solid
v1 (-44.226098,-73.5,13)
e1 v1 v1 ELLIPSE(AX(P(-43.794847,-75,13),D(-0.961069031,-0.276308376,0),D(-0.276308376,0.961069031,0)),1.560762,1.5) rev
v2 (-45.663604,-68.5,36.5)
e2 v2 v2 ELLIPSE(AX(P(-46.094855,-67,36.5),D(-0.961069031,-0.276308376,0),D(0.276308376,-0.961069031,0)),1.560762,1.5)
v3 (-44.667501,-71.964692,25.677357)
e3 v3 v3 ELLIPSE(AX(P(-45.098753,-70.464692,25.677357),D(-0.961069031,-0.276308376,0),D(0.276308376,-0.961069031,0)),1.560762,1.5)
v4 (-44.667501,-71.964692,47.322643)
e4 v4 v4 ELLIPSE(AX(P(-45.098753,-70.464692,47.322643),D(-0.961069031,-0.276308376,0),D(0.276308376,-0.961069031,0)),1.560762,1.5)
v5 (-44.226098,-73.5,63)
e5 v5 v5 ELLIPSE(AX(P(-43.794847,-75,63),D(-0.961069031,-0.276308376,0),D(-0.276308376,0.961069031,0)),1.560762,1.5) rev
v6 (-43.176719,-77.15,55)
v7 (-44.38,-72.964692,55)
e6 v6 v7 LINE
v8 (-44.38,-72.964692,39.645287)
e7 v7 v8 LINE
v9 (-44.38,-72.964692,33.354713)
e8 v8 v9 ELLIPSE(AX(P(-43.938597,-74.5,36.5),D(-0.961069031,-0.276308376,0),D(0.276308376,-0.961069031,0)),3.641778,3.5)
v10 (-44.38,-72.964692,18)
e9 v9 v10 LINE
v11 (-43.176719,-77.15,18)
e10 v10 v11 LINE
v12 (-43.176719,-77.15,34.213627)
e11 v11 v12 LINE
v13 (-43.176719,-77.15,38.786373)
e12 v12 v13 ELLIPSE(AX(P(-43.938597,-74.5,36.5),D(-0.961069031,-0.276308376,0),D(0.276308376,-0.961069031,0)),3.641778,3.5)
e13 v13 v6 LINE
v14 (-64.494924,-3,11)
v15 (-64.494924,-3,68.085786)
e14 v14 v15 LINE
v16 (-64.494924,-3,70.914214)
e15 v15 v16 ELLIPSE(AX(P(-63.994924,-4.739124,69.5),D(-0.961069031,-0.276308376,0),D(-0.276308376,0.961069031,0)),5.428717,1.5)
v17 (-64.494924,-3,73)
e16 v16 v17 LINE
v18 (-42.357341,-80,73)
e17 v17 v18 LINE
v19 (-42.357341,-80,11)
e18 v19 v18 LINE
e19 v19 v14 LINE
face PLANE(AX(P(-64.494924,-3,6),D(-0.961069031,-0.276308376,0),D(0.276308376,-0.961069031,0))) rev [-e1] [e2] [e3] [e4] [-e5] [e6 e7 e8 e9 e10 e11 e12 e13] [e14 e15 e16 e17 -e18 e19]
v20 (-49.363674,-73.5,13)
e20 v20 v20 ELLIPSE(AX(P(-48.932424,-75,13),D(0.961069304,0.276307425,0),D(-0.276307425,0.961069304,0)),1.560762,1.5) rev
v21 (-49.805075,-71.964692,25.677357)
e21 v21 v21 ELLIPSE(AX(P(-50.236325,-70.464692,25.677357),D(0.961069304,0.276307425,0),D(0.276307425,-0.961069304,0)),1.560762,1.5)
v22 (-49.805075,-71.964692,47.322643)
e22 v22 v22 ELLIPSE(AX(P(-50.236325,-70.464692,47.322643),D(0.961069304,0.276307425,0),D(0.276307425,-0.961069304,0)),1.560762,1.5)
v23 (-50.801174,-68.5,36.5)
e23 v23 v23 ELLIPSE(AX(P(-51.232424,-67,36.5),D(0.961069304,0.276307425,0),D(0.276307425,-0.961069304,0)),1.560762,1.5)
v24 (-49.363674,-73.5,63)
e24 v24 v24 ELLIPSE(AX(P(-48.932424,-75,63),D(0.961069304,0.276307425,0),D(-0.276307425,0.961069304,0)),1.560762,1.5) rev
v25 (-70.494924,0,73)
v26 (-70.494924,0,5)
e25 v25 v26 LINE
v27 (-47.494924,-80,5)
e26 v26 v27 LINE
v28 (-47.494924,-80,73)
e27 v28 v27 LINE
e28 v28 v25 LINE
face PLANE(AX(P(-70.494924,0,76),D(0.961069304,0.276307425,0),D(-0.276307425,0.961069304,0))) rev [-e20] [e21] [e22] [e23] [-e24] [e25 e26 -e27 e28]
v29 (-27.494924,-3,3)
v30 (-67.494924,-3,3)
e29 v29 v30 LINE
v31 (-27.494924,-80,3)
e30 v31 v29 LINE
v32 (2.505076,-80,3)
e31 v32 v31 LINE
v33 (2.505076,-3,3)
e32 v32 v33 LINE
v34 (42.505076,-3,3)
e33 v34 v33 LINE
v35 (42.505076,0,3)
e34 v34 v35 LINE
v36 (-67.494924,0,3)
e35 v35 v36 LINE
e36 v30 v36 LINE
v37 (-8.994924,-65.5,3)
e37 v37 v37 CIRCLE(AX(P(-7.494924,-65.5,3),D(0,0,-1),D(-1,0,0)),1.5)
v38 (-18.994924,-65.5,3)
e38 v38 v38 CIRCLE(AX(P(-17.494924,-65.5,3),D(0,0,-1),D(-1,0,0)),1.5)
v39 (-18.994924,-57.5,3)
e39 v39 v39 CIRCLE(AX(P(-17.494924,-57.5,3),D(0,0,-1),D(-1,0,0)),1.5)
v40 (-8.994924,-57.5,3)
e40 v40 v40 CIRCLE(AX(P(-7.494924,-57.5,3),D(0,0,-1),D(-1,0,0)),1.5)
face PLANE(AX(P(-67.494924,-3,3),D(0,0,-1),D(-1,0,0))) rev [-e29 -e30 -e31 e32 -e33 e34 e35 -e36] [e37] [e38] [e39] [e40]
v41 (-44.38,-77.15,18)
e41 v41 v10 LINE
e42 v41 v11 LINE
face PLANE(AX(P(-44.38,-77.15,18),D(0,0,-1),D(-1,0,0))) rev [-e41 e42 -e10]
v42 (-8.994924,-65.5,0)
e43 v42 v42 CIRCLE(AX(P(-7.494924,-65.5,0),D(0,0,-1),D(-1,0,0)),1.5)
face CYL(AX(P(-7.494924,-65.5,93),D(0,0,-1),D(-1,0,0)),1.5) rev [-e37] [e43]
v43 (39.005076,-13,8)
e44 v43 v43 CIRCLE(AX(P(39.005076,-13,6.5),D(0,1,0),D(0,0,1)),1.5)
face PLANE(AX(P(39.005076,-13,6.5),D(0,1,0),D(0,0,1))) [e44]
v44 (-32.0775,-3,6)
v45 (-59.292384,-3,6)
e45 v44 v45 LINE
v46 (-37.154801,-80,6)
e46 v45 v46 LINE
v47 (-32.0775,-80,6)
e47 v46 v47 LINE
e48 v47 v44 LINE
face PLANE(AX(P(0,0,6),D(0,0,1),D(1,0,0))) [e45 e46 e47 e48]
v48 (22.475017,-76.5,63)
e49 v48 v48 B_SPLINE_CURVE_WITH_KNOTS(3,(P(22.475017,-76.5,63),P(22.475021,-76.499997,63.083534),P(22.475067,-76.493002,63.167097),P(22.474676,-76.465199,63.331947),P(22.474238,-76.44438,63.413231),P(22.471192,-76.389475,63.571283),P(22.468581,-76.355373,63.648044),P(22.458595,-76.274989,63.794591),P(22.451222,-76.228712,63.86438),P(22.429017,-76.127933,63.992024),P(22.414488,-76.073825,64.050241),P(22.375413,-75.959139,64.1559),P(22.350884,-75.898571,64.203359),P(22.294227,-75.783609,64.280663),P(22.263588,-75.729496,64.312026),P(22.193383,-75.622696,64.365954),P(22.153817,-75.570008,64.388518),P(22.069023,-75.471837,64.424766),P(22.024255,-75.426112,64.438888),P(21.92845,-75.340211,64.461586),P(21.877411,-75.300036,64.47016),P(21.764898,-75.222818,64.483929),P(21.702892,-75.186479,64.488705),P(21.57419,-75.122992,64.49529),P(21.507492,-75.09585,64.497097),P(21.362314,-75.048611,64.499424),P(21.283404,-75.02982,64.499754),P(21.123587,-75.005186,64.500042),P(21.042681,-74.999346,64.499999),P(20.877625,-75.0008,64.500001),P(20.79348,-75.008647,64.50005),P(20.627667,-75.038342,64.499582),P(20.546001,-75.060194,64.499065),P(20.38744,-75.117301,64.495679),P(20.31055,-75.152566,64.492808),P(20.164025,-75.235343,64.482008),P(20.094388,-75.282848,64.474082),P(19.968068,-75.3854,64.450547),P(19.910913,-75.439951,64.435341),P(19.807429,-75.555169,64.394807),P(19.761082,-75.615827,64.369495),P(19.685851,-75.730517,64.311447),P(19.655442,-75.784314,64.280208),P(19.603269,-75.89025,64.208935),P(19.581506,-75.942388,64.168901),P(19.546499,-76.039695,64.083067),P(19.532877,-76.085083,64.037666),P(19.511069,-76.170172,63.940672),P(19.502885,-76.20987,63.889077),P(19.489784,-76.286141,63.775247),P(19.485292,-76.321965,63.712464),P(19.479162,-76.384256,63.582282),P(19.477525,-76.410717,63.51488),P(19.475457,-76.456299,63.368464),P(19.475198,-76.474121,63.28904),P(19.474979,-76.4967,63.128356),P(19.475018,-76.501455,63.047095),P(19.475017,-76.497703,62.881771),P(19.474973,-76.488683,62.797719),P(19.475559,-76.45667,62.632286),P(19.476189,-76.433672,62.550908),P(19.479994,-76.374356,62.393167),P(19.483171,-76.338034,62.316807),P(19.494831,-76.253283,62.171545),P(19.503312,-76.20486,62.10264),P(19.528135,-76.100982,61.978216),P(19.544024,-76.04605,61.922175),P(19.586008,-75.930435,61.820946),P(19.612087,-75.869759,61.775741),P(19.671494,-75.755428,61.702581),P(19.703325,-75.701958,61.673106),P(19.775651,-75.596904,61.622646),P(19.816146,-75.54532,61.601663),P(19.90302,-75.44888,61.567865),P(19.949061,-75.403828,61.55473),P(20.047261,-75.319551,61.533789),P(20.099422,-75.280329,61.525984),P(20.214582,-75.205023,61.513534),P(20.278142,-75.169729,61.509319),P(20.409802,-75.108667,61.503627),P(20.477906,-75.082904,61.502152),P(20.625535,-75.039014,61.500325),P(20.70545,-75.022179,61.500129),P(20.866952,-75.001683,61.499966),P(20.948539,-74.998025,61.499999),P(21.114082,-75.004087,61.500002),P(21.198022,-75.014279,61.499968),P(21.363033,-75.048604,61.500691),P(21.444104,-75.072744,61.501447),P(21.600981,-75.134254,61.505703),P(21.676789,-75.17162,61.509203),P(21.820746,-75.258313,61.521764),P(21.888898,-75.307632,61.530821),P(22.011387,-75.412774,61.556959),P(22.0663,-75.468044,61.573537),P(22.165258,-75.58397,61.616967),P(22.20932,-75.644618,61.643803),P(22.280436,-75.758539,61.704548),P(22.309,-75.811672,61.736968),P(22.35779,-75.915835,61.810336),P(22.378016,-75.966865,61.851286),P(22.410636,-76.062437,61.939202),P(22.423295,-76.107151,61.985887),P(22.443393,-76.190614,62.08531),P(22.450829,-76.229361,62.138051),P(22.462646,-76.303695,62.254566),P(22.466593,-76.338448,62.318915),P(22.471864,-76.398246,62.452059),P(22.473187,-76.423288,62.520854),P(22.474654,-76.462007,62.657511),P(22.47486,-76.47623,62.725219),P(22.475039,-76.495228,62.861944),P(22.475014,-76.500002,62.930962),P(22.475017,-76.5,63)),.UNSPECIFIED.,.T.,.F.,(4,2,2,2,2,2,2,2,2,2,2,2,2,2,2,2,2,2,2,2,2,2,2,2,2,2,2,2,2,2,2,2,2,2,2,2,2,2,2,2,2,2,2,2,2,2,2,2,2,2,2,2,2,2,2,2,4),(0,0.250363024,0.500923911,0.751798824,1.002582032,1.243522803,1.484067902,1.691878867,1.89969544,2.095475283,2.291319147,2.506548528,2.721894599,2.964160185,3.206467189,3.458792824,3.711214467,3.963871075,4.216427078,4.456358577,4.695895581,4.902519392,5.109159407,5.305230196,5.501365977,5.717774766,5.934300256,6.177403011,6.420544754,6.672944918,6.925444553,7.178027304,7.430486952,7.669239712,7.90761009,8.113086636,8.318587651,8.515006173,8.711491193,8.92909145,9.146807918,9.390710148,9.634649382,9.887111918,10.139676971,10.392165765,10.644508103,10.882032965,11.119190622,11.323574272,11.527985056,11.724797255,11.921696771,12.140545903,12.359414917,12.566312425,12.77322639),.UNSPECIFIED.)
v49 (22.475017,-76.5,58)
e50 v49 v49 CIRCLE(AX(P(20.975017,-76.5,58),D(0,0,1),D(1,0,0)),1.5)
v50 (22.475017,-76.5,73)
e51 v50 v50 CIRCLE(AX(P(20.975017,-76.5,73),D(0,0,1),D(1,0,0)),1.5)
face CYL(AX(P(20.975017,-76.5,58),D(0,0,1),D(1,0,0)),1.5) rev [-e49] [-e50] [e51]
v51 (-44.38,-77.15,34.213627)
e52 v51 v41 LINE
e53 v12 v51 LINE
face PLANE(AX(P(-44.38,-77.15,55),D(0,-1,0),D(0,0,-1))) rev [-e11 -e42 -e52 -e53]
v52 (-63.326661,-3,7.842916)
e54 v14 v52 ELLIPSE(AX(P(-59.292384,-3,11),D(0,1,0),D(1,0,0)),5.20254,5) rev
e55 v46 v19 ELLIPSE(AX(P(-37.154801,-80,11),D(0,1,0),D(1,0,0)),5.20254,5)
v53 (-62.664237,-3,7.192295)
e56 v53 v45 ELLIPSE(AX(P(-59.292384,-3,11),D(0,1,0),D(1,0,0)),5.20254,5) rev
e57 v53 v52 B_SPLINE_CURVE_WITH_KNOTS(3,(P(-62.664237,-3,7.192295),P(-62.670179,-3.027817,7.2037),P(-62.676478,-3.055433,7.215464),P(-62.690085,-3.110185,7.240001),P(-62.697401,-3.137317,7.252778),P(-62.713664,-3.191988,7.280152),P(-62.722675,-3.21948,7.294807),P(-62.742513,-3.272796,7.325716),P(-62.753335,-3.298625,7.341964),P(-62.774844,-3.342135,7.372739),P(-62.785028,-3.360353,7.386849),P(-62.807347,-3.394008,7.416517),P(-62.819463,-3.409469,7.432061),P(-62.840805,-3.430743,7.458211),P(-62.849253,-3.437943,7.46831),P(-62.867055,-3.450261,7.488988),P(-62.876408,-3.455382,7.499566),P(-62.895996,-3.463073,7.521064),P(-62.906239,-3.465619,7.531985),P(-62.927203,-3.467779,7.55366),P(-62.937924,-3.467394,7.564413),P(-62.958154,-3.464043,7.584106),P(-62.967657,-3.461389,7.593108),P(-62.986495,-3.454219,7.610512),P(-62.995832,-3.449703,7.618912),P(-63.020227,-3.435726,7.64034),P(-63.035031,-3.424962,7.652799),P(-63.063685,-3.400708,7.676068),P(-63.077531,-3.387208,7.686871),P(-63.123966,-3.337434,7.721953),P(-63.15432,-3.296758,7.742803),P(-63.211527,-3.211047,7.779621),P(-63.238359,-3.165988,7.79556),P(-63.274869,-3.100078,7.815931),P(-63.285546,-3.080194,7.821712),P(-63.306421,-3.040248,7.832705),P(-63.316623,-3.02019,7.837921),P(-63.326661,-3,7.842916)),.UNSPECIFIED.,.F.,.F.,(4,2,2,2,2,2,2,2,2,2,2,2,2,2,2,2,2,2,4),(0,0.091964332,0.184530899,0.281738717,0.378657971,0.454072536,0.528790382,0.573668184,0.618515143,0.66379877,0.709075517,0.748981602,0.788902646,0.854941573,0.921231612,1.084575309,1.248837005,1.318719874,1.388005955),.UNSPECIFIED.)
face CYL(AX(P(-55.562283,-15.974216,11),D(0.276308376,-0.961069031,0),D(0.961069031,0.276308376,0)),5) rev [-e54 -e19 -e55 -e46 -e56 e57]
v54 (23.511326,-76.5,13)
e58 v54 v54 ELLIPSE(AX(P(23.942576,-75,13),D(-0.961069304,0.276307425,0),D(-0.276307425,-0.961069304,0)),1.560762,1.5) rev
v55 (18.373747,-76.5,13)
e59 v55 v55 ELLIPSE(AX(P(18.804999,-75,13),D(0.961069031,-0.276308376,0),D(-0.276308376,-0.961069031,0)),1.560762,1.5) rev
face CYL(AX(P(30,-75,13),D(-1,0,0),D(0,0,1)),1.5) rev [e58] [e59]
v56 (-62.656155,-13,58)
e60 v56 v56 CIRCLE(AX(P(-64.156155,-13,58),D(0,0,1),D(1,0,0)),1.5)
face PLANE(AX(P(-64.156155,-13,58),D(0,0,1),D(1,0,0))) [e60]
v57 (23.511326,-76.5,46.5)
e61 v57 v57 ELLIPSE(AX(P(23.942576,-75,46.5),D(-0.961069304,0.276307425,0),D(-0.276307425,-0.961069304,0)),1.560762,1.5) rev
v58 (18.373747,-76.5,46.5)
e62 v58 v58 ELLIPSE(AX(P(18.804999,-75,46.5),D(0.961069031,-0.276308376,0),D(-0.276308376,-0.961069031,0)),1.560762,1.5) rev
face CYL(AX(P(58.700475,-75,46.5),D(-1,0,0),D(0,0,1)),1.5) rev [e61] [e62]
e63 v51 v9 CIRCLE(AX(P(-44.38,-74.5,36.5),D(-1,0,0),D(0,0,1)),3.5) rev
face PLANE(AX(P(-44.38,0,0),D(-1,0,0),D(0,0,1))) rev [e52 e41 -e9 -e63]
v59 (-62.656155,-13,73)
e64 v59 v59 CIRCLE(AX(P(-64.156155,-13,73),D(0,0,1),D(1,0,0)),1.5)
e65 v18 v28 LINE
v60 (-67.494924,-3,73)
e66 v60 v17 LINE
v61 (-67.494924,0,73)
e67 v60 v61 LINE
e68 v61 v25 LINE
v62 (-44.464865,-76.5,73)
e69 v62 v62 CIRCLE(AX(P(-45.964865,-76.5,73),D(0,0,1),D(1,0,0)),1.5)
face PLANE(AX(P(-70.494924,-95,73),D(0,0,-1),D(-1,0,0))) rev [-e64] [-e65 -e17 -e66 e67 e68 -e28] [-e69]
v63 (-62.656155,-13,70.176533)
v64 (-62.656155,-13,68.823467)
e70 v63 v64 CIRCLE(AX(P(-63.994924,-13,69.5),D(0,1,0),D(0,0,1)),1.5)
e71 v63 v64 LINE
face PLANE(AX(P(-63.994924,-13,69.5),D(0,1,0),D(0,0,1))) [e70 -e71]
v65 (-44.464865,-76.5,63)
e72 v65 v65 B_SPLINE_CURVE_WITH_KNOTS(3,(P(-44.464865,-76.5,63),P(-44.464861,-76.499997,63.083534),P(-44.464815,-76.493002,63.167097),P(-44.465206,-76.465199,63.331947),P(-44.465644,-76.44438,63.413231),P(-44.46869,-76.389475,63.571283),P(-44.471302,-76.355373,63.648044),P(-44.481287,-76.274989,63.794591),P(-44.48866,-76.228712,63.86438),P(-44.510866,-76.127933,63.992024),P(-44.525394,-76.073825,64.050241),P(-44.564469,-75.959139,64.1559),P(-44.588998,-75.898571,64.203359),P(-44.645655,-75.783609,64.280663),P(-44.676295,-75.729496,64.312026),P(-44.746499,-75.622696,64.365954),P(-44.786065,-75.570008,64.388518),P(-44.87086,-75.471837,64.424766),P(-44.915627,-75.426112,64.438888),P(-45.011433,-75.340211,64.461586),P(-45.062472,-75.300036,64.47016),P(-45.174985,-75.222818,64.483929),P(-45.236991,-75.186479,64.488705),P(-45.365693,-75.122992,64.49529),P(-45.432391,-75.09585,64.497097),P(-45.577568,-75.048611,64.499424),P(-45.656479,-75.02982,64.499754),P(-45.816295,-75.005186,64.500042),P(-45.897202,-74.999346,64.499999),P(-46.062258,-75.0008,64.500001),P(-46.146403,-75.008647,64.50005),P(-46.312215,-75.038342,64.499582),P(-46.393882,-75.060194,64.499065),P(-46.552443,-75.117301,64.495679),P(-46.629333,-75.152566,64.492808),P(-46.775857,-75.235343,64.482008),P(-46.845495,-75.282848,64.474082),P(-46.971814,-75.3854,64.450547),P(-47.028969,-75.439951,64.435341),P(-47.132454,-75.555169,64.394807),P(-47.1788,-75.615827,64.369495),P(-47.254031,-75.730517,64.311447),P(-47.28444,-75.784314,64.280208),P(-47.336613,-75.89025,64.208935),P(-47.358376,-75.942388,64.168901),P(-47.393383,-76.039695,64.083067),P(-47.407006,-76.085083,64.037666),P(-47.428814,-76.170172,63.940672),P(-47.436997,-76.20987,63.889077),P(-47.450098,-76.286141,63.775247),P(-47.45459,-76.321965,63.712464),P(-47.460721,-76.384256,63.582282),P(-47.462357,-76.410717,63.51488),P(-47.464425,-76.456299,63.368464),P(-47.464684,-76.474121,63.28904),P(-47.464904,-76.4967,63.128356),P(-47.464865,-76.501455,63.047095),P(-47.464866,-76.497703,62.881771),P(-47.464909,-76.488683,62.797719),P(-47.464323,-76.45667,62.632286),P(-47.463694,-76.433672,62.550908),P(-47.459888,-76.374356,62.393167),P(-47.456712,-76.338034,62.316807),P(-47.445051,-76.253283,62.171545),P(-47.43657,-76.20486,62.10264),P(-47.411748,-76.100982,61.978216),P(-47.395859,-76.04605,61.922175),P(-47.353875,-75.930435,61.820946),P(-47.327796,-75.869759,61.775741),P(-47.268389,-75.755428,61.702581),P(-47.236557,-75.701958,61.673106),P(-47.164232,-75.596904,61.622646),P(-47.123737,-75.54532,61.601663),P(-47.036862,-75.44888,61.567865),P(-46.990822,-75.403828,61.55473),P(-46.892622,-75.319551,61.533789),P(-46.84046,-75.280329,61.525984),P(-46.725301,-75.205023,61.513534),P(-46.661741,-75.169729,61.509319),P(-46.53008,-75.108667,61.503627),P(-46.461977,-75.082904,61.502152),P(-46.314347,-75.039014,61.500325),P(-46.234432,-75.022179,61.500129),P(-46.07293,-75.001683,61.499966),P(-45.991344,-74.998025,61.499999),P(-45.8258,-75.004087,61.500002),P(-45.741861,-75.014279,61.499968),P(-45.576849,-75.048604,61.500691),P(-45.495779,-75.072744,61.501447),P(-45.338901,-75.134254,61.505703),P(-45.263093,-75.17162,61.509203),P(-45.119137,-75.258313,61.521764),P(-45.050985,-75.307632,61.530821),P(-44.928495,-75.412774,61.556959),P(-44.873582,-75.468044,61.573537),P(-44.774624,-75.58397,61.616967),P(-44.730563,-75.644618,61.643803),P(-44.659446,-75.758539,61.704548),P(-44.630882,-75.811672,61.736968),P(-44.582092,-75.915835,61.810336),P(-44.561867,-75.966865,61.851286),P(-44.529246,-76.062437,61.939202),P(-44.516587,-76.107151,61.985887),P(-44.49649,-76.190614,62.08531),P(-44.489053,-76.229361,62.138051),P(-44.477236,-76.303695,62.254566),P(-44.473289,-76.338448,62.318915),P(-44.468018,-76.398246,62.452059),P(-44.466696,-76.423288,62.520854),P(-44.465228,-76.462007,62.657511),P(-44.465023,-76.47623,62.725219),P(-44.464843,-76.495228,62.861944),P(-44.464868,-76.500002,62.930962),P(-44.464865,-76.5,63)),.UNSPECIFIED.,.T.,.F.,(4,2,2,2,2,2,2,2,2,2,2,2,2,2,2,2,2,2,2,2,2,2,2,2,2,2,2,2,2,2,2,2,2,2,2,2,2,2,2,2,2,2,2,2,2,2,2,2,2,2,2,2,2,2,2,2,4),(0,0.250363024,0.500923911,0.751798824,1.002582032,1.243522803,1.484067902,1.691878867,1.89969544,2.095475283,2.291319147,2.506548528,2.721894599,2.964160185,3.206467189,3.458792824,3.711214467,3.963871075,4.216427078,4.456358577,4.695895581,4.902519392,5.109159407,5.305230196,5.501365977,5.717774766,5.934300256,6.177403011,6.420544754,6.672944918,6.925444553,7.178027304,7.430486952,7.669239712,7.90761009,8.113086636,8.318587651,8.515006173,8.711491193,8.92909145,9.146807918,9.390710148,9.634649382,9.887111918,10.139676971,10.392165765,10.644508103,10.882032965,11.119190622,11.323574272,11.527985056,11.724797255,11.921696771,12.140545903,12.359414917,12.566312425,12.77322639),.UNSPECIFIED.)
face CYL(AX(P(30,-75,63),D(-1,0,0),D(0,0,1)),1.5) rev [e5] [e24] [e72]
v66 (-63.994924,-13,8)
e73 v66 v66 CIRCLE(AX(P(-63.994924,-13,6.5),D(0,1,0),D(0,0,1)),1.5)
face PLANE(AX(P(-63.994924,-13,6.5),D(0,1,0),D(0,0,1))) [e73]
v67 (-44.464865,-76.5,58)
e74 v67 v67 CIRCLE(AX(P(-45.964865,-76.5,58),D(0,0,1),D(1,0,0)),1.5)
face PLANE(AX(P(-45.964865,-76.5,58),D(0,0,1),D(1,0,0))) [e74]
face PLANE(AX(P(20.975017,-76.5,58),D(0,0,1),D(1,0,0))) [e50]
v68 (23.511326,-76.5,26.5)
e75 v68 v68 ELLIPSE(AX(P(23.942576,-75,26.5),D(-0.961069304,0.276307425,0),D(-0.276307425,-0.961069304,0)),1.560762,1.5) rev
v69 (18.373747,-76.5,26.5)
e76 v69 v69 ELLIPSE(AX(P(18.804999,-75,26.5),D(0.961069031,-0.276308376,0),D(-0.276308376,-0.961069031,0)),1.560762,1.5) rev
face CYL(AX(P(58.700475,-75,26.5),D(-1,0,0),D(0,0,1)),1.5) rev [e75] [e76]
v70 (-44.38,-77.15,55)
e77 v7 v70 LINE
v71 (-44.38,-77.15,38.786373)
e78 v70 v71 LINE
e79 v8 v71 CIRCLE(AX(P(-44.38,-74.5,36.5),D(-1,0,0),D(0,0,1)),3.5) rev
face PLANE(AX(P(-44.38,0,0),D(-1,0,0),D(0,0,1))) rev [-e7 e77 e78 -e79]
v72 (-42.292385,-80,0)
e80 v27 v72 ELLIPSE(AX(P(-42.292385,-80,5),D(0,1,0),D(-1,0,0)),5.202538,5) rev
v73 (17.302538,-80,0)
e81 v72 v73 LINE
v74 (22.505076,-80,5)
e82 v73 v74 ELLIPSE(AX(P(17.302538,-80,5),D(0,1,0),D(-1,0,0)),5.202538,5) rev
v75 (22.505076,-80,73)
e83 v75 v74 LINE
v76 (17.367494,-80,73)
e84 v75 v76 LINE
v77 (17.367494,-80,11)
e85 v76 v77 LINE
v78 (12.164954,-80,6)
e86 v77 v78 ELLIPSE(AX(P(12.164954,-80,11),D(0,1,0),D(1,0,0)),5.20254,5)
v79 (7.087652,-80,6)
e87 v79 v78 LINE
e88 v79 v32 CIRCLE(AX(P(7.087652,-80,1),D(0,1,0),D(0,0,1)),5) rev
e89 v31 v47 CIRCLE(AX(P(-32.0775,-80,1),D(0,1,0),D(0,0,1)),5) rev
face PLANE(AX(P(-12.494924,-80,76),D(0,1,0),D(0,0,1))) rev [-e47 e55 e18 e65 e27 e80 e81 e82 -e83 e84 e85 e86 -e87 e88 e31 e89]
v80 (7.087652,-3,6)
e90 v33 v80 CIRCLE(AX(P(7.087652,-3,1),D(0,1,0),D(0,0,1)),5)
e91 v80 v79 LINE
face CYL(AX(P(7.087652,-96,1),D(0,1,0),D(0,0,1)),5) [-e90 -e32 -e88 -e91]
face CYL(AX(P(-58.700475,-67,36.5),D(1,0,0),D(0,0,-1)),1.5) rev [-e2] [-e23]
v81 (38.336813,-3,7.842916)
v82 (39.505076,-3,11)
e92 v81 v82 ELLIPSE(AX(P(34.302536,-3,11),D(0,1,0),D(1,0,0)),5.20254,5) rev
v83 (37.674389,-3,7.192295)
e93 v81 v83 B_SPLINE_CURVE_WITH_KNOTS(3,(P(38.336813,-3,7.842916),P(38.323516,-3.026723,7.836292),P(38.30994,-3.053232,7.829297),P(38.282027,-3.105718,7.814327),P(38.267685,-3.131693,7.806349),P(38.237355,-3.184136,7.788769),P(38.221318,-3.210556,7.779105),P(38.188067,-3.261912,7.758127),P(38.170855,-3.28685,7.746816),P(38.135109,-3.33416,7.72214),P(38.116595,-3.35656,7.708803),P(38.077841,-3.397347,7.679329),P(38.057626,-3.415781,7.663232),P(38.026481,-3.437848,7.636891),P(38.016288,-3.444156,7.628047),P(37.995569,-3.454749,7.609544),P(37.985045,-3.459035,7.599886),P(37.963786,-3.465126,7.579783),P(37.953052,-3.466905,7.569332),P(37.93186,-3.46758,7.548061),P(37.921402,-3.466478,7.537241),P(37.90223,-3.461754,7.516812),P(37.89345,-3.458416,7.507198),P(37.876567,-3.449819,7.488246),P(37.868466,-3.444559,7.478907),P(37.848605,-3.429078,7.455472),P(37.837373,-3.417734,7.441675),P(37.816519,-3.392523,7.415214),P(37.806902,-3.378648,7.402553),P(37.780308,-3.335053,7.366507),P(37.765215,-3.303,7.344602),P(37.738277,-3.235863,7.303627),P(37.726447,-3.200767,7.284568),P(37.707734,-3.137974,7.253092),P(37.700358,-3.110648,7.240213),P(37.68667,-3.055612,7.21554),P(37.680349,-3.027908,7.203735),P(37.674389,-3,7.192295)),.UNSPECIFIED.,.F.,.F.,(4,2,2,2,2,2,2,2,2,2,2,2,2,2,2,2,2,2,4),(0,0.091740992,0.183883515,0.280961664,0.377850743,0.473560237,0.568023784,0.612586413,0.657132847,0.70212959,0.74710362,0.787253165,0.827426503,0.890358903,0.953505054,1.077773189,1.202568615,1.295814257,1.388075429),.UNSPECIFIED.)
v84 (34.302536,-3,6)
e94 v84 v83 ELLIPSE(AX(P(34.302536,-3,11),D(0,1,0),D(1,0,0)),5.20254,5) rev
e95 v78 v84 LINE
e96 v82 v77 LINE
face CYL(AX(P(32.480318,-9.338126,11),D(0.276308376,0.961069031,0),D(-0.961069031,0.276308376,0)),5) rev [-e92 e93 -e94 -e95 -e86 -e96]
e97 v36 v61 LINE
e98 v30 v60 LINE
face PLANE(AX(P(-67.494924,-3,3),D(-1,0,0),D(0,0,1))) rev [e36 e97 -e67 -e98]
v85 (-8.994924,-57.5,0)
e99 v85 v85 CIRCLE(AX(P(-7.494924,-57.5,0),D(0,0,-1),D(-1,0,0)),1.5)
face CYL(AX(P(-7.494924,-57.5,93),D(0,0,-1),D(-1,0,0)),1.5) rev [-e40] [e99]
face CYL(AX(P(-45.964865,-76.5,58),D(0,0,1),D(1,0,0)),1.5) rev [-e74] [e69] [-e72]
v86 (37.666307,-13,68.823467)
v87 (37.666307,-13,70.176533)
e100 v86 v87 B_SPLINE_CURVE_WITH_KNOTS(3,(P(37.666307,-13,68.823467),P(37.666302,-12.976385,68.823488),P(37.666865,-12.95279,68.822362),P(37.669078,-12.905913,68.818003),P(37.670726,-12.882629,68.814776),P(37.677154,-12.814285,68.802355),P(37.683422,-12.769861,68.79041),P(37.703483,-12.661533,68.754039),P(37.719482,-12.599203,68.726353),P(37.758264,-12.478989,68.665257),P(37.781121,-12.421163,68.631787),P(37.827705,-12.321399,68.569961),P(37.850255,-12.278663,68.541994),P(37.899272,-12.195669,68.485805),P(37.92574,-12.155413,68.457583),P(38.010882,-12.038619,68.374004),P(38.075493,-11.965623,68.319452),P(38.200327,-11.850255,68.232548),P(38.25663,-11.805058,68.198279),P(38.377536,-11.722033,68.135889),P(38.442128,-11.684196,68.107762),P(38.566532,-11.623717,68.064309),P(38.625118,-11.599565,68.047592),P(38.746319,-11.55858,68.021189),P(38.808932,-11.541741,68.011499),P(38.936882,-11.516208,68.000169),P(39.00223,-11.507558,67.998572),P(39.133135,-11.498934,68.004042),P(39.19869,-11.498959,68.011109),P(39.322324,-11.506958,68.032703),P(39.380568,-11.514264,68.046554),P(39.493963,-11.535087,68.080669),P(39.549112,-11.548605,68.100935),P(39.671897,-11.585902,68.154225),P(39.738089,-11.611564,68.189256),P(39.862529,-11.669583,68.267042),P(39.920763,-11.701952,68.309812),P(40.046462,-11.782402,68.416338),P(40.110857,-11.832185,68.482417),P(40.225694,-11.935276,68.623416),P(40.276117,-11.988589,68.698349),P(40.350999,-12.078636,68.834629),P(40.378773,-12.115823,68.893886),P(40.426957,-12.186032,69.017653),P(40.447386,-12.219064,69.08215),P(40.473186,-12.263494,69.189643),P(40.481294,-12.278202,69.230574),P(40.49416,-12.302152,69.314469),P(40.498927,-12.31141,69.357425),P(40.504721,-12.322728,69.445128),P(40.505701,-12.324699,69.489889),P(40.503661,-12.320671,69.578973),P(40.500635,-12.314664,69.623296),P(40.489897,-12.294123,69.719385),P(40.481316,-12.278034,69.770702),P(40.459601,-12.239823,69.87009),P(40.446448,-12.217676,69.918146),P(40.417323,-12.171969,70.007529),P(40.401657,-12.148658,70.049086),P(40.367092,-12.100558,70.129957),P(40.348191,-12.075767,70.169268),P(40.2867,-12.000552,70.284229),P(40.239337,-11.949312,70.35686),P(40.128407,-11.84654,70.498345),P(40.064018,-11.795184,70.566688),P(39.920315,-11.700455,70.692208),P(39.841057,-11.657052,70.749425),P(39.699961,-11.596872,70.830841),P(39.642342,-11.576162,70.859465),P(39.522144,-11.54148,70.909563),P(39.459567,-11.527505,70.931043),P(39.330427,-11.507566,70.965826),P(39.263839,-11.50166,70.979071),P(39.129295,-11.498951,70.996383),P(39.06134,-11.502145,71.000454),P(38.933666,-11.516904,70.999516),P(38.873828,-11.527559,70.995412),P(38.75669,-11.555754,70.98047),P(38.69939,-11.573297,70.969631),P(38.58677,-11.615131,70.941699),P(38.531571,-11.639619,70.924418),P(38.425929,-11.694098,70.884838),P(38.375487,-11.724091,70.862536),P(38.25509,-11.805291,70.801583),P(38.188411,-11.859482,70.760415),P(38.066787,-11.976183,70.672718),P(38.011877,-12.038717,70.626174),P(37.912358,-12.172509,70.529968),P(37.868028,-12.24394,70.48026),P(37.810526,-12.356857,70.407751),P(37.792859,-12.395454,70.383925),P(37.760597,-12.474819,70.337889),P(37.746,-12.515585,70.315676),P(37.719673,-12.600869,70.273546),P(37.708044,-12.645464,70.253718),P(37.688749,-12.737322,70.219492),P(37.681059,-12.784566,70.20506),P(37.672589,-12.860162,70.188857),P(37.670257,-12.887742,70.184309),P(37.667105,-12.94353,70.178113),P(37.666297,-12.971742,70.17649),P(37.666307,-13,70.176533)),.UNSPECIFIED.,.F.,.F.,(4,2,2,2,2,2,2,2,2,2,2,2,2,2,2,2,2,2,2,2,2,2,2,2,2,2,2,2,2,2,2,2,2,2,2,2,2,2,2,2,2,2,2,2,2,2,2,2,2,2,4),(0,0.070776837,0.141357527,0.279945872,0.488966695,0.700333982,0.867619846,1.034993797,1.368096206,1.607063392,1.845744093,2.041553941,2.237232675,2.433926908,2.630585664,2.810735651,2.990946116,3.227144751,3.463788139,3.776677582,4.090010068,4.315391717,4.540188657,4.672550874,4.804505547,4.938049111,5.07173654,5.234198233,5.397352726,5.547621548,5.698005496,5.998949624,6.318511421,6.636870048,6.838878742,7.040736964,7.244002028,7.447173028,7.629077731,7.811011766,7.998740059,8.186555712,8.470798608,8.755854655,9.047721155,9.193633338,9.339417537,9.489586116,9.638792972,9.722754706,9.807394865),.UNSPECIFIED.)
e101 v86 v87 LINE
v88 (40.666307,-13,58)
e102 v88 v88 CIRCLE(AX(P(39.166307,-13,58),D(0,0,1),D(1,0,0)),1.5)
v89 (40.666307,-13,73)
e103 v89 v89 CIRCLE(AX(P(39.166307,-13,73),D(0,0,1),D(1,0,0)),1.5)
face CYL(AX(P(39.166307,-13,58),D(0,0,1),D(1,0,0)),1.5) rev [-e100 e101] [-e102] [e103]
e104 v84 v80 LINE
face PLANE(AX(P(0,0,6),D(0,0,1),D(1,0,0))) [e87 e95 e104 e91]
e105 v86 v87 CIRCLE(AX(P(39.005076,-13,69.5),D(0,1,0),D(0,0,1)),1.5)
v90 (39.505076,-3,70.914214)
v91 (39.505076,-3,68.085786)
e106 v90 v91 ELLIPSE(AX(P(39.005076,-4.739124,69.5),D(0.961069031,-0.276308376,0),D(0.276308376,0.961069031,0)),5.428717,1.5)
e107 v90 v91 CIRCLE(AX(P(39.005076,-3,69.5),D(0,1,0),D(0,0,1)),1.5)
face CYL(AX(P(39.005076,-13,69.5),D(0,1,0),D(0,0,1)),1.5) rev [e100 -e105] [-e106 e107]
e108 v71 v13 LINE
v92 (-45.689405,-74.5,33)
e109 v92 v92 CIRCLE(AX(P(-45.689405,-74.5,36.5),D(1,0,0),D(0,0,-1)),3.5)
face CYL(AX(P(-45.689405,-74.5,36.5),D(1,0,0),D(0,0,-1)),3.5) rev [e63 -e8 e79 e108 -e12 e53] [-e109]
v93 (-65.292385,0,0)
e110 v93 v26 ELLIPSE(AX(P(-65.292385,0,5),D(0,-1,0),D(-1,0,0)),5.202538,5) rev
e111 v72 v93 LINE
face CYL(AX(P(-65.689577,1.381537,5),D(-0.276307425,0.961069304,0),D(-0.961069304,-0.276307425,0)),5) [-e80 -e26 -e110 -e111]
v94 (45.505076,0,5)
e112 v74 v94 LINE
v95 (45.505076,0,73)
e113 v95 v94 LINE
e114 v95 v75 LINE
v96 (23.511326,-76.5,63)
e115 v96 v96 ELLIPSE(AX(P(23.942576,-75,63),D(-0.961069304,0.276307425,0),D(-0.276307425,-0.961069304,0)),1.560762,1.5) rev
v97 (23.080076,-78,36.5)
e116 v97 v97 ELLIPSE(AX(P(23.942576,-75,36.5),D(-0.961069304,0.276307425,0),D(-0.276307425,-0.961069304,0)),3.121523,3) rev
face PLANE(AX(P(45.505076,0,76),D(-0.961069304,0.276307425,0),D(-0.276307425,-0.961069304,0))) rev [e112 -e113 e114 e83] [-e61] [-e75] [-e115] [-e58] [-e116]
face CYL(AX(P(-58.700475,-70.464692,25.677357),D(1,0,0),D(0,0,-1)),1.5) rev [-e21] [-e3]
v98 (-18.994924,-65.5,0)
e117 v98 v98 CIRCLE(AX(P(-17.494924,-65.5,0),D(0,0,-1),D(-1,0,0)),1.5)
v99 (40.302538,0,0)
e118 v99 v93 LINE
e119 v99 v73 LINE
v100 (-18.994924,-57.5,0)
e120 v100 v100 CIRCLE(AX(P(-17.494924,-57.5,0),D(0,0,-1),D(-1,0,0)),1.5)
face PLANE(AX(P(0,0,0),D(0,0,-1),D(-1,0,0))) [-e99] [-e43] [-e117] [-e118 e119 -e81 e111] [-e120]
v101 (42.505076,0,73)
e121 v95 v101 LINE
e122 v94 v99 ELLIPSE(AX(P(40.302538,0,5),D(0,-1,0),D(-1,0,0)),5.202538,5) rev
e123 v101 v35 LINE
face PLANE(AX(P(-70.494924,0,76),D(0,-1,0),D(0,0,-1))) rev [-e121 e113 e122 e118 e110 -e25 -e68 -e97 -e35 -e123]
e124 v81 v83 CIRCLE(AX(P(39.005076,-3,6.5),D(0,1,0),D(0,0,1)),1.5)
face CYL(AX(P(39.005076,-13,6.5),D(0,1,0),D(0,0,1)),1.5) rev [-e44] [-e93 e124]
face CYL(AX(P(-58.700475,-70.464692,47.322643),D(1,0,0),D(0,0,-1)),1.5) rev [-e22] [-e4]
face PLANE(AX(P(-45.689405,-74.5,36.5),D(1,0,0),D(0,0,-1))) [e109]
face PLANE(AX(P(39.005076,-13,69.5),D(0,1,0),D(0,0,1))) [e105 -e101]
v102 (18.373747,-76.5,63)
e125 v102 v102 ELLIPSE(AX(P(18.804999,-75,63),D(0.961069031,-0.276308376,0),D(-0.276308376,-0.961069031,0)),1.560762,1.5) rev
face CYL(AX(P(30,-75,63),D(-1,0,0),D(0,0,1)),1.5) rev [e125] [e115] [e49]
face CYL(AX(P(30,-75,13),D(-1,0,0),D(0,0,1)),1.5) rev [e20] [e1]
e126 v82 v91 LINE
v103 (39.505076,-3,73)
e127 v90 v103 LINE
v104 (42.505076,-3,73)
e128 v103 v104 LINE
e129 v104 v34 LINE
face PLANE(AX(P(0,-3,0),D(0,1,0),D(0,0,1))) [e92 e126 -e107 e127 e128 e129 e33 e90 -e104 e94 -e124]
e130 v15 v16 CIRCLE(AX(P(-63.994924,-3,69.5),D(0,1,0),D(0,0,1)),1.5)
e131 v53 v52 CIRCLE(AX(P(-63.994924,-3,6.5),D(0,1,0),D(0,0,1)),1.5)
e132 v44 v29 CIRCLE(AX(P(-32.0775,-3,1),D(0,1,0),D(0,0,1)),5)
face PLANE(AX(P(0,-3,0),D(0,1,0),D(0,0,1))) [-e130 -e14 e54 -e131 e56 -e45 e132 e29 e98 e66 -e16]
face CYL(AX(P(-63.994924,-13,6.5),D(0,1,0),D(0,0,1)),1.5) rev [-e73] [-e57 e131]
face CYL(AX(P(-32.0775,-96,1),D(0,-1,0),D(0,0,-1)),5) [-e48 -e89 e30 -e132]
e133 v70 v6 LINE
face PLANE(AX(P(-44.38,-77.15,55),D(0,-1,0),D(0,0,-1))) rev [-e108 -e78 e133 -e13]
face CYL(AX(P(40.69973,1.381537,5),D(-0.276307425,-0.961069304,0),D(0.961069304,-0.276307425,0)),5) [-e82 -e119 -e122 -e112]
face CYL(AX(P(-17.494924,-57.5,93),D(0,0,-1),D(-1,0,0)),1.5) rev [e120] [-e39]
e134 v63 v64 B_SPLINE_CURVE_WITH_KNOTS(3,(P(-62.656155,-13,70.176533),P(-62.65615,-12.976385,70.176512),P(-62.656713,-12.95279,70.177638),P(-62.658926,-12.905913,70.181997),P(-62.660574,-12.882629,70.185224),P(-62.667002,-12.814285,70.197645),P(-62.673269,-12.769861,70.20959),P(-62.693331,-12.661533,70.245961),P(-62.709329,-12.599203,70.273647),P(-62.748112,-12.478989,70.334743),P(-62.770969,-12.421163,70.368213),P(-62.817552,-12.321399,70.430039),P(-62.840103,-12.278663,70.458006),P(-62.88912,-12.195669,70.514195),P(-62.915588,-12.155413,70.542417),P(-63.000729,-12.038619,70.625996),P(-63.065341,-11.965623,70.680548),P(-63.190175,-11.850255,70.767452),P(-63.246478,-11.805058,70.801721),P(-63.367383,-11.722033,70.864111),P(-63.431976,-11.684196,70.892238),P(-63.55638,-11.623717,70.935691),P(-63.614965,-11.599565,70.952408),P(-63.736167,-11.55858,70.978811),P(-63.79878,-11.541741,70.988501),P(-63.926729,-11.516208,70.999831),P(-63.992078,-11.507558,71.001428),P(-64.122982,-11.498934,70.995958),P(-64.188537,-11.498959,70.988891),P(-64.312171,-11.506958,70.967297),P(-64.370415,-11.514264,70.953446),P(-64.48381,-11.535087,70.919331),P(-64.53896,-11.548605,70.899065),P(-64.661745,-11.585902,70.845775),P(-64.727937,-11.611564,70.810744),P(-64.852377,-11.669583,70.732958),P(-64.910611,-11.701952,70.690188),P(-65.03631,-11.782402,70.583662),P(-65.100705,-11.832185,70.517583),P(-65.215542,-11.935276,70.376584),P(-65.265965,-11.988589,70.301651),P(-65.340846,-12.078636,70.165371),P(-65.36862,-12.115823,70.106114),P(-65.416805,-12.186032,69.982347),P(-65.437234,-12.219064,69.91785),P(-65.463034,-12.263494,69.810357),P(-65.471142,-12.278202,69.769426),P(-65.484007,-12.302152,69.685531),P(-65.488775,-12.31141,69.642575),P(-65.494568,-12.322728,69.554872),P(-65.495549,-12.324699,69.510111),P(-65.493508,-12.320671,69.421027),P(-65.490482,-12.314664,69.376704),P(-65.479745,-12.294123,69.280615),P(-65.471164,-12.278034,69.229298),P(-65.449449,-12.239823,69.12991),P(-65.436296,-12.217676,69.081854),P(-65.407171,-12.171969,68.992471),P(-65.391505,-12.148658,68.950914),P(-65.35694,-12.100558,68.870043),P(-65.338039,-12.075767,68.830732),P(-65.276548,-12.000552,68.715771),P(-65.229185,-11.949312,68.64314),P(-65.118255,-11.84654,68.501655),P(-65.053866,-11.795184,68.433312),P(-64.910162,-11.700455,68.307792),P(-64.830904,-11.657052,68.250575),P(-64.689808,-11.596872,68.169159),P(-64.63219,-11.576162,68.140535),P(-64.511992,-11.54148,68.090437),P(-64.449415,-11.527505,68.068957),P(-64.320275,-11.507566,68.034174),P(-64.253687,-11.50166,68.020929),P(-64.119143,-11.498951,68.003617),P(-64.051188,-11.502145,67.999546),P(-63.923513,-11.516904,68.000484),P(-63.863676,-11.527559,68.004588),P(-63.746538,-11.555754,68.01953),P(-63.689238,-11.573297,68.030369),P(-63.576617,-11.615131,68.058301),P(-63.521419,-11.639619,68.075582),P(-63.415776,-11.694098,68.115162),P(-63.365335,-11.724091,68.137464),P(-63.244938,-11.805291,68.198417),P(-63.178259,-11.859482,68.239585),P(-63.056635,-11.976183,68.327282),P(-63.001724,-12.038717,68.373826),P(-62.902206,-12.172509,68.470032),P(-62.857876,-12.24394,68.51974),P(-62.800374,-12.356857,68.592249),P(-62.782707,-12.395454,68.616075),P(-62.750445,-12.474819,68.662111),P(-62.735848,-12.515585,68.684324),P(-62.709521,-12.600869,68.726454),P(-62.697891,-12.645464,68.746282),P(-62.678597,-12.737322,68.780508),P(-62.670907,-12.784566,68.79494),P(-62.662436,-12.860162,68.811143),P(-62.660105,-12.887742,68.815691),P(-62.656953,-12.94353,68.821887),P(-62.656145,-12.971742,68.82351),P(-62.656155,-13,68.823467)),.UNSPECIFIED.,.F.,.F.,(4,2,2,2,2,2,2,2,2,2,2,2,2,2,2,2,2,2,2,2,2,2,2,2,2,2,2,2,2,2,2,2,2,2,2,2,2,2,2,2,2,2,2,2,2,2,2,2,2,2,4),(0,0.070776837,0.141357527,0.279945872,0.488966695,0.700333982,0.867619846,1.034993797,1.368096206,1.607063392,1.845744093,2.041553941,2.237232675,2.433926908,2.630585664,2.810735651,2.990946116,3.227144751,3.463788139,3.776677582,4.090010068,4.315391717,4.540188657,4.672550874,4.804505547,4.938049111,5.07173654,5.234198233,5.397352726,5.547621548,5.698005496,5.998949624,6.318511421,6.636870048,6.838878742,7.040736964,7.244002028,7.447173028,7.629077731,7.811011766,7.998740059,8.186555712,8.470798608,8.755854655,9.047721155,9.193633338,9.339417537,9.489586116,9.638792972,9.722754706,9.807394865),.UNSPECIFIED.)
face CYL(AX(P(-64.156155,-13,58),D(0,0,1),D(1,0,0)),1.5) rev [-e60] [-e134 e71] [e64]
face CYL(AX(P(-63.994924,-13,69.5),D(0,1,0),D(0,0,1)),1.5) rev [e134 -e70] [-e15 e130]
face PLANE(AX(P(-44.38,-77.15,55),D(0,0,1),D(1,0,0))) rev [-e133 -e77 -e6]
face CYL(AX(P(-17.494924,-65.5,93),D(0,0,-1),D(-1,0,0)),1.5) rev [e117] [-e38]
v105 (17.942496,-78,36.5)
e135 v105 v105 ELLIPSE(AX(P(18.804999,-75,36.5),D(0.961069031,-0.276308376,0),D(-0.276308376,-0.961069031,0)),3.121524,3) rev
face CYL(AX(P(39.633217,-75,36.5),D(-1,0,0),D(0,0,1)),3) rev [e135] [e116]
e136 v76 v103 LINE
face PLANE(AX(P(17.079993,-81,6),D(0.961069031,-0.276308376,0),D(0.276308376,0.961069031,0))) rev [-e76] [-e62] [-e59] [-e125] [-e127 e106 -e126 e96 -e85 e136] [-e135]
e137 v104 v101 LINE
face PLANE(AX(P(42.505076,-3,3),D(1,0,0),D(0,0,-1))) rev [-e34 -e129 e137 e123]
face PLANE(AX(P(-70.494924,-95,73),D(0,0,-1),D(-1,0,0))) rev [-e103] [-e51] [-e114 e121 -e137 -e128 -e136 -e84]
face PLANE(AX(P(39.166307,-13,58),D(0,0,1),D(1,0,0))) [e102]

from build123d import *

# Parameters (mm, degrees)
BOSS_EXTRUDE1_DEPTH     = 76
CUT_EXTRUDE1_DEPTH      = 3
CUT_EXTRUDE2_DEPTH      = 70
SKETCH4_W               = 116
SKETCH4_H               = 3
CUT_EXTRUDE3_DEPTH      = 95.00000000000003
FILLET1_R               = 5
FILLET2_R               = 5
SKETCH6_R               = 1.500000000000004
SKETCH6_R_2             = 1.4999999999999971
SKETCH6_R_3             = 1.4999999999999973
SKETCH6_R_4             = 1.5000000000000042
CUT_EXTRUDE4_DEPTH      = 10
SKETCH7_W               = 29.999999999999996
SKETCH7_H               = 5.999999999999984
CUT_EXTRUDE5_DEPTH      = 93.00000000000001
FILLET3_R               = 5
FILLET4_R               = 5
SKETCH8_R               = 1.4999999999999991
SKETCH8_R_2             = 1.5000000000000009
CUT_EXTRUDE6_DEPTH      = 93.00000000000001
SKETCH9_R               = 1.5000000000000009
SKETCH9_R_2             = 1.5000000000000042
SKETCH9_R_3             = 1.4999999999999973
CUT_EXTRUDE7_DEPTH      = 15
FILLET5_R               = 5
FILLET6_R               = 5
CUT_EXTRUDE8_DEPTH      = 30
CUT_EXTRUDE8_DEPTH_BACK = 70
SKETCH10_R              = 1.4999999999999973
SKETCH10_R_2            = 1.5000000000000009
SKETCH12_R              = 3.500000000000001
CUT_EXTRUDE9_DEPTH      = 45.6894054301587
SKETCH13_R              = 3.0000000000000018
CUT_EXTRUDE10_DEPTH     = 39.63321669991409
SKETCH15_W              = 37.000000000000014
SKETCH15_H              = 5.299999999999997
CUT_EXTRUDE13_DEPTH     = 44.38
SKETCH17_R              = 1.5000000000000042
SKETCH17_R_2            = 1.5000000000000009
CUT_EXTRUDE14_DEPTH     = 58.70047510000001
SKETCH18_R              = 1.5000000000000042
CUT_EXTRUDE15_DEPTH     = 58.70047510000001
SKETCH19_R              = 1.5000000000000042
SKETCH19_R_2            = 1.5000000000000009
CUT_EXTRUDE16_DEPTH     = 58.70047510000001


with BuildPart() as part:
    # Sketch1 → Boss-Extrude1 (new body)
    with BuildSketch(Plane.XY):
        Polygon((-70.49492385786803, 0), (45.505076142131976, 0), (22.50507614213199, -80), (-12.494923857868015, -80), (-47.494923857868024, -80), align=None)
    extrude(amount=BOSS_EXTRUDE1_DEPTH)

    # Sketch2 → Cut-Extrude1 (cut)
    with BuildSketch(Plane(origin=(0, 0, 0), x_dir=(1, 0, 0), z_dir=(0, 1, 0))):
        Polygon((-67.49492385786803, -3), (42.505076142131976, -3), (42.50507614213198, -73), (-67.49492385786802, -73), align=None)
    extrude(amount=-CUT_EXTRUDE1_DEPTH, mode=Mode.SUBTRACT)

    # Sketch3 → Cut-Extrude2 (cut)
    with BuildSketch(Plane.XY.offset(76)):
        Polygon((-42.069840297681274, -81), (17.079992581945223, -81), (39.505076142131976, -3.0000000000000124), (-64.49492385786802, -3.0000000000000124), align=None)
    extrude(amount=-CUT_EXTRUDE2_DEPTH, mode=Mode.SUBTRACT)

    # Sketch4 → Cut-Extrude3 (cut)
    with BuildSketch(Plane(origin=(0, 0, 0), x_dir=(1, 0, 0), z_dir=(0, 1, 0))):
        with Locations((-12.494923857868027, -74.5)):
            Rectangle(SKETCH4_W, SKETCH4_H)
    extrude(amount=-CUT_EXTRUDE3_DEPTH, mode=Mode.SUBTRACT)

    # Fillet1
    fillet1_edges = [part.edges().sort_by_distance(p)[0] for p in [
        (28.43628489768082, -41.50000000000001, 6),
    ]]
    fillet(fillet1_edges, radius=FILLET1_R)

    # Fillet2
    fillet2_edges = [part.edges().sort_by_distance(p)[0] for p in [
        (-53.42613261341687, -41.500000000000014, 6),
    ]]
    fillet(fillet2_edges, radius=FILLET2_R)

    # Sketch6 → Cut-Extrude4 (cut)
    with BuildSketch(Plane(origin=(0, -3, 0), x_dir=(1, 0, 0), z_dir=(0, 1, 0))):
        with Locations(Location((39.005076142131976, -6.500000000000005, 0), (0, 0, 270))):
            Circle(SKETCH6_R)
        with Locations(Location((-63.994923857868024, -6.500000000000001, 0), (0, 0, 270))):
            Circle(SKETCH6_R_2)
        with Locations(Location((-63.994923857868024, -69.49999999999999, 0), (0, 0, 270))):
            Circle(SKETCH6_R_3)
        with Locations(Location((39.00507614213195, -69.49999999999999, 0), (0, 0, 270))):
            Circle(SKETCH6_R_4)
    extrude(amount=-CUT_EXTRUDE4_DEPTH, mode=Mode.SUBTRACT)

    # Sketch7 → Cut-Extrude5 (cut)
    with BuildSketch(Plane(origin=(0, -3, 0), x_dir=(1, 0, 0), z_dir=(0, 1, 0))):
        with Locations((-12.494923857868004, -5.999999999999992)):
            Rectangle(SKETCH7_W, SKETCH7_H)
    extrude(amount=-CUT_EXTRUDE5_DEPTH, mode=Mode.SUBTRACT)

    # Fillet3
    fillet3_edges = [part.edges().sort_by_distance(p)[0] for p in [
        (34.00507614213198, -40, 0),
    ]]
    fillet(fillet3_edges, radius=FILLET3_R)

    # Fillet4
    fillet4_edges = [part.edges().sort_by_distance(p)[0] for p in [
        (-58.99492385786803, -40, 0),
    ]]
    fillet(fillet4_edges, radius=FILLET4_R)

    # Sketch8 → Cut-Extrude6 (cut)
    with BuildSketch(Plane(origin=(0, 0, 0), x_dir=(-1, 0, 0), z_dir=(0, 0, -1))):
        with Locations((7.494923857868018, -65.49999999999999)):
            Circle(SKETCH8_R)
        with Locations((7.494923857868017, -57.49999999999999)):
            Circle(SKETCH8_R_2)
        with Locations((17.494923857868017, -57.49999999999999)):
            Circle(SKETCH8_R_2)
        with Locations((17.494923857868017, -65.49999999999999)):
            Circle(SKETCH8_R_2)
    extrude(amount=-CUT_EXTRUDE6_DEPTH, mode=Mode.SUBTRACT)

    # Sketch9 → Cut-Extrude7 (cut)
    with BuildSketch(Plane.XY.offset(73)):
        with Locations((20.975017364193207, -76.5)):
            Circle(SKETCH9_R)
        with Locations((-45.964865079929254, -76.5)):
            Circle(SKETCH9_R_2)
        with Locations((-64.15615463641093, -12.999999999999998)):
            Circle(SKETCH9_R_3)
        with Locations((39.166306920674884, -13.000000000000002)):
            Circle(SKETCH9_R_2)
    extrude(amount=-CUT_EXTRUDE7_DEPTH, mode=Mode.SUBTRACT)

    # Fillet5
    # the kernel refuses this fillet: 5 mm, written as the material it takes off along each edge
    with BuildSketch(Plane(origin=(2.505076142131994, -91.45643923738959, 6), x_dir=(1, 0, 0), z_dir=(0, 1, 0))) as fillet5_piece_1:
        with BuildLine():
            CenterArc((4.582575694955839, 5), FILLET5_R, 203.57817847820183, 66.42182152179817)
            Line((-8.9e-16, 2.9999999999999996), (-0.09165151389911763, 2.9599999999999995))
            ThreePointArc((-0.09165151389911763, 2.9599999999999995), (-0.09999999999999964, 1.5), (-0.10000000000000009, 0))
            Line((-0.10000000000000009, 0), (0, -0.09999999999999964))
            Line((0, -0.09999999999999964), (4.582575694955839, -0.09999999999999964))
            Line((4.582575694955839, -0.09999999999999964), (4.582575694955839, 0))
        make_face()
    extrude(amount=99.91287847477919, mode=Mode.SUBTRACT)

    # Fillet6
    # the kernel refuses this fillet: 5 mm, written as the material it takes off along each edge
    with BuildSketch(Plane(origin=(-27.494923857868002, 8.456439237389588, 6), x_dir=(1.18e-15, 0, -1), z_dir=(0, -1, 0))) as fillet6_piece_1:
        with BuildLine():
            CenterArc((4.999999999999995, -4.582575694955842), FILLET6_R, 113.57817847820179, 66.42182152179812)
            Line((-5.43e-15, -4.582575694955835), (-0.10000000000000507, -4.582575694955835))
            Line((-0.10000000000000507, -4.582575694955835), (-0.09999999999999964, 1.2e-16))
            Line((-0.09999999999999964, 1.2e-16), (1.2e-16, 0.10000000000000142))
            ThreePointArc((1.2e-16, 0.10000000000000142), (1.4999999999999993, 0.09999999999999964), (2.959999999999998, 0.0916515138991159))
            Line((2.959999999999998, 0.0916515138991159), (2.9999999999999982, 0))
        make_face()
    extrude(amount=99.91287847477918, mode=Mode.SUBTRACT)

    # Sketch10 → Cut-Extrude8 (cut, two sides: drawn at the far end of the back side and taken through both)
    with BuildSketch(Plane(origin=(0, 0, 0), x_dir=(0, 0, -1), z_dir=(1, 0, 0)).offset(-CUT_EXTRUDE8_DEPTH_BACK)):
        with Locations(Location((-63, -75, 0), (0, 0, 90))):
            Circle(SKETCH10_R)
        with Locations(Location((-12.999999999999998, -75, 0), (0, 0, 270))):
            Circle(SKETCH10_R_2)
    extrude(amount=CUT_EXTRUDE8_DEPTH + CUT_EXTRUDE8_DEPTH_BACK, mode=Mode.SUBTRACT)

    # Sketch12 → Cut-Extrude9 (cut)
    with BuildSketch(Plane(origin=(0, 0, 0), x_dir=(0, 0, -1), z_dir=(1, 0, 0))):
        with Locations((-36.5, -74.50000000000001)):
            Circle(SKETCH12_R)
    extrude(amount=-CUT_EXTRUDE9_DEPTH, mode=Mode.SUBTRACT)

    # Sketch13 → Cut-Extrude10 (cut)
    with BuildSketch(Plane(origin=(0, 0, 0), x_dir=(0, 0, -1), z_dir=(1, 0, 0))):
        with Locations(Location((-36.5, -75.00000000000001, 0), (0, 0, 270))):
            Circle(SKETCH13_R)
    extrude(amount=CUT_EXTRUDE10_DEPTH, mode=Mode.SUBTRACT)

    # Sketch15 → Cut-Extrude13 (cut)
    with BuildSketch(Plane(origin=(0, 0, 0), x_dir=(0, 0, -1), z_dir=(1, 0, 0))):
        with Locations((-36.5, -74.5)):
            Rectangle(SKETCH15_W, SKETCH15_H)
    extrude(amount=-CUT_EXTRUDE13_DEPTH, mode=Mode.SUBTRACT)

    # Sketch17 → Cut-Extrude14 (cut)
    with BuildSketch(Plane(origin=(0, 0, 0), x_dir=(0, 0, -1), z_dir=(1, 0, 0))):
        with Locations(Location((-47.32264338558277, -70.46469184619794, 0), (0, 0, 270))):
            Circle(SKETCH17_R)
        with Locations(Location((-25.677356614417228, -70.46469184619795, 0), (0, 0, 270))):
            Circle(SKETCH17_R_2)
    extrude(amount=-CUT_EXTRUDE14_DEPTH, mode=Mode.SUBTRACT)

    # Sketch18 → Cut-Extrude15 (cut)
    with BuildSketch(Plane(origin=(0, 0, 0), x_dir=(0, 0, -1), z_dir=(1, 0, 0))):
        with Locations(Location((-36.5, -67, 0), (0, 0, 270))):
            Circle(SKETCH18_R)
    extrude(amount=-CUT_EXTRUDE15_DEPTH, mode=Mode.SUBTRACT)

    # Sketch19 → Cut-Extrude16 (cut)
    with BuildSketch(Plane(origin=(0, 0, 0), x_dir=(0, 0, -1), z_dir=(1, 0, 0))):
        with Locations(Location((-46.5, -75.00000000000001, 0), (0, 0, 270))):
            Circle(SKETCH19_R)
        with Locations(Location((-26.499999999999996, -75.00000000000001, 0), (0, 0, 270))):
            Circle(SKETCH19_R_2)
    extrude(amount=CUT_EXTRUDE16_DEPTH, mode=Mode.SUBTRACT)


solid = part.part
